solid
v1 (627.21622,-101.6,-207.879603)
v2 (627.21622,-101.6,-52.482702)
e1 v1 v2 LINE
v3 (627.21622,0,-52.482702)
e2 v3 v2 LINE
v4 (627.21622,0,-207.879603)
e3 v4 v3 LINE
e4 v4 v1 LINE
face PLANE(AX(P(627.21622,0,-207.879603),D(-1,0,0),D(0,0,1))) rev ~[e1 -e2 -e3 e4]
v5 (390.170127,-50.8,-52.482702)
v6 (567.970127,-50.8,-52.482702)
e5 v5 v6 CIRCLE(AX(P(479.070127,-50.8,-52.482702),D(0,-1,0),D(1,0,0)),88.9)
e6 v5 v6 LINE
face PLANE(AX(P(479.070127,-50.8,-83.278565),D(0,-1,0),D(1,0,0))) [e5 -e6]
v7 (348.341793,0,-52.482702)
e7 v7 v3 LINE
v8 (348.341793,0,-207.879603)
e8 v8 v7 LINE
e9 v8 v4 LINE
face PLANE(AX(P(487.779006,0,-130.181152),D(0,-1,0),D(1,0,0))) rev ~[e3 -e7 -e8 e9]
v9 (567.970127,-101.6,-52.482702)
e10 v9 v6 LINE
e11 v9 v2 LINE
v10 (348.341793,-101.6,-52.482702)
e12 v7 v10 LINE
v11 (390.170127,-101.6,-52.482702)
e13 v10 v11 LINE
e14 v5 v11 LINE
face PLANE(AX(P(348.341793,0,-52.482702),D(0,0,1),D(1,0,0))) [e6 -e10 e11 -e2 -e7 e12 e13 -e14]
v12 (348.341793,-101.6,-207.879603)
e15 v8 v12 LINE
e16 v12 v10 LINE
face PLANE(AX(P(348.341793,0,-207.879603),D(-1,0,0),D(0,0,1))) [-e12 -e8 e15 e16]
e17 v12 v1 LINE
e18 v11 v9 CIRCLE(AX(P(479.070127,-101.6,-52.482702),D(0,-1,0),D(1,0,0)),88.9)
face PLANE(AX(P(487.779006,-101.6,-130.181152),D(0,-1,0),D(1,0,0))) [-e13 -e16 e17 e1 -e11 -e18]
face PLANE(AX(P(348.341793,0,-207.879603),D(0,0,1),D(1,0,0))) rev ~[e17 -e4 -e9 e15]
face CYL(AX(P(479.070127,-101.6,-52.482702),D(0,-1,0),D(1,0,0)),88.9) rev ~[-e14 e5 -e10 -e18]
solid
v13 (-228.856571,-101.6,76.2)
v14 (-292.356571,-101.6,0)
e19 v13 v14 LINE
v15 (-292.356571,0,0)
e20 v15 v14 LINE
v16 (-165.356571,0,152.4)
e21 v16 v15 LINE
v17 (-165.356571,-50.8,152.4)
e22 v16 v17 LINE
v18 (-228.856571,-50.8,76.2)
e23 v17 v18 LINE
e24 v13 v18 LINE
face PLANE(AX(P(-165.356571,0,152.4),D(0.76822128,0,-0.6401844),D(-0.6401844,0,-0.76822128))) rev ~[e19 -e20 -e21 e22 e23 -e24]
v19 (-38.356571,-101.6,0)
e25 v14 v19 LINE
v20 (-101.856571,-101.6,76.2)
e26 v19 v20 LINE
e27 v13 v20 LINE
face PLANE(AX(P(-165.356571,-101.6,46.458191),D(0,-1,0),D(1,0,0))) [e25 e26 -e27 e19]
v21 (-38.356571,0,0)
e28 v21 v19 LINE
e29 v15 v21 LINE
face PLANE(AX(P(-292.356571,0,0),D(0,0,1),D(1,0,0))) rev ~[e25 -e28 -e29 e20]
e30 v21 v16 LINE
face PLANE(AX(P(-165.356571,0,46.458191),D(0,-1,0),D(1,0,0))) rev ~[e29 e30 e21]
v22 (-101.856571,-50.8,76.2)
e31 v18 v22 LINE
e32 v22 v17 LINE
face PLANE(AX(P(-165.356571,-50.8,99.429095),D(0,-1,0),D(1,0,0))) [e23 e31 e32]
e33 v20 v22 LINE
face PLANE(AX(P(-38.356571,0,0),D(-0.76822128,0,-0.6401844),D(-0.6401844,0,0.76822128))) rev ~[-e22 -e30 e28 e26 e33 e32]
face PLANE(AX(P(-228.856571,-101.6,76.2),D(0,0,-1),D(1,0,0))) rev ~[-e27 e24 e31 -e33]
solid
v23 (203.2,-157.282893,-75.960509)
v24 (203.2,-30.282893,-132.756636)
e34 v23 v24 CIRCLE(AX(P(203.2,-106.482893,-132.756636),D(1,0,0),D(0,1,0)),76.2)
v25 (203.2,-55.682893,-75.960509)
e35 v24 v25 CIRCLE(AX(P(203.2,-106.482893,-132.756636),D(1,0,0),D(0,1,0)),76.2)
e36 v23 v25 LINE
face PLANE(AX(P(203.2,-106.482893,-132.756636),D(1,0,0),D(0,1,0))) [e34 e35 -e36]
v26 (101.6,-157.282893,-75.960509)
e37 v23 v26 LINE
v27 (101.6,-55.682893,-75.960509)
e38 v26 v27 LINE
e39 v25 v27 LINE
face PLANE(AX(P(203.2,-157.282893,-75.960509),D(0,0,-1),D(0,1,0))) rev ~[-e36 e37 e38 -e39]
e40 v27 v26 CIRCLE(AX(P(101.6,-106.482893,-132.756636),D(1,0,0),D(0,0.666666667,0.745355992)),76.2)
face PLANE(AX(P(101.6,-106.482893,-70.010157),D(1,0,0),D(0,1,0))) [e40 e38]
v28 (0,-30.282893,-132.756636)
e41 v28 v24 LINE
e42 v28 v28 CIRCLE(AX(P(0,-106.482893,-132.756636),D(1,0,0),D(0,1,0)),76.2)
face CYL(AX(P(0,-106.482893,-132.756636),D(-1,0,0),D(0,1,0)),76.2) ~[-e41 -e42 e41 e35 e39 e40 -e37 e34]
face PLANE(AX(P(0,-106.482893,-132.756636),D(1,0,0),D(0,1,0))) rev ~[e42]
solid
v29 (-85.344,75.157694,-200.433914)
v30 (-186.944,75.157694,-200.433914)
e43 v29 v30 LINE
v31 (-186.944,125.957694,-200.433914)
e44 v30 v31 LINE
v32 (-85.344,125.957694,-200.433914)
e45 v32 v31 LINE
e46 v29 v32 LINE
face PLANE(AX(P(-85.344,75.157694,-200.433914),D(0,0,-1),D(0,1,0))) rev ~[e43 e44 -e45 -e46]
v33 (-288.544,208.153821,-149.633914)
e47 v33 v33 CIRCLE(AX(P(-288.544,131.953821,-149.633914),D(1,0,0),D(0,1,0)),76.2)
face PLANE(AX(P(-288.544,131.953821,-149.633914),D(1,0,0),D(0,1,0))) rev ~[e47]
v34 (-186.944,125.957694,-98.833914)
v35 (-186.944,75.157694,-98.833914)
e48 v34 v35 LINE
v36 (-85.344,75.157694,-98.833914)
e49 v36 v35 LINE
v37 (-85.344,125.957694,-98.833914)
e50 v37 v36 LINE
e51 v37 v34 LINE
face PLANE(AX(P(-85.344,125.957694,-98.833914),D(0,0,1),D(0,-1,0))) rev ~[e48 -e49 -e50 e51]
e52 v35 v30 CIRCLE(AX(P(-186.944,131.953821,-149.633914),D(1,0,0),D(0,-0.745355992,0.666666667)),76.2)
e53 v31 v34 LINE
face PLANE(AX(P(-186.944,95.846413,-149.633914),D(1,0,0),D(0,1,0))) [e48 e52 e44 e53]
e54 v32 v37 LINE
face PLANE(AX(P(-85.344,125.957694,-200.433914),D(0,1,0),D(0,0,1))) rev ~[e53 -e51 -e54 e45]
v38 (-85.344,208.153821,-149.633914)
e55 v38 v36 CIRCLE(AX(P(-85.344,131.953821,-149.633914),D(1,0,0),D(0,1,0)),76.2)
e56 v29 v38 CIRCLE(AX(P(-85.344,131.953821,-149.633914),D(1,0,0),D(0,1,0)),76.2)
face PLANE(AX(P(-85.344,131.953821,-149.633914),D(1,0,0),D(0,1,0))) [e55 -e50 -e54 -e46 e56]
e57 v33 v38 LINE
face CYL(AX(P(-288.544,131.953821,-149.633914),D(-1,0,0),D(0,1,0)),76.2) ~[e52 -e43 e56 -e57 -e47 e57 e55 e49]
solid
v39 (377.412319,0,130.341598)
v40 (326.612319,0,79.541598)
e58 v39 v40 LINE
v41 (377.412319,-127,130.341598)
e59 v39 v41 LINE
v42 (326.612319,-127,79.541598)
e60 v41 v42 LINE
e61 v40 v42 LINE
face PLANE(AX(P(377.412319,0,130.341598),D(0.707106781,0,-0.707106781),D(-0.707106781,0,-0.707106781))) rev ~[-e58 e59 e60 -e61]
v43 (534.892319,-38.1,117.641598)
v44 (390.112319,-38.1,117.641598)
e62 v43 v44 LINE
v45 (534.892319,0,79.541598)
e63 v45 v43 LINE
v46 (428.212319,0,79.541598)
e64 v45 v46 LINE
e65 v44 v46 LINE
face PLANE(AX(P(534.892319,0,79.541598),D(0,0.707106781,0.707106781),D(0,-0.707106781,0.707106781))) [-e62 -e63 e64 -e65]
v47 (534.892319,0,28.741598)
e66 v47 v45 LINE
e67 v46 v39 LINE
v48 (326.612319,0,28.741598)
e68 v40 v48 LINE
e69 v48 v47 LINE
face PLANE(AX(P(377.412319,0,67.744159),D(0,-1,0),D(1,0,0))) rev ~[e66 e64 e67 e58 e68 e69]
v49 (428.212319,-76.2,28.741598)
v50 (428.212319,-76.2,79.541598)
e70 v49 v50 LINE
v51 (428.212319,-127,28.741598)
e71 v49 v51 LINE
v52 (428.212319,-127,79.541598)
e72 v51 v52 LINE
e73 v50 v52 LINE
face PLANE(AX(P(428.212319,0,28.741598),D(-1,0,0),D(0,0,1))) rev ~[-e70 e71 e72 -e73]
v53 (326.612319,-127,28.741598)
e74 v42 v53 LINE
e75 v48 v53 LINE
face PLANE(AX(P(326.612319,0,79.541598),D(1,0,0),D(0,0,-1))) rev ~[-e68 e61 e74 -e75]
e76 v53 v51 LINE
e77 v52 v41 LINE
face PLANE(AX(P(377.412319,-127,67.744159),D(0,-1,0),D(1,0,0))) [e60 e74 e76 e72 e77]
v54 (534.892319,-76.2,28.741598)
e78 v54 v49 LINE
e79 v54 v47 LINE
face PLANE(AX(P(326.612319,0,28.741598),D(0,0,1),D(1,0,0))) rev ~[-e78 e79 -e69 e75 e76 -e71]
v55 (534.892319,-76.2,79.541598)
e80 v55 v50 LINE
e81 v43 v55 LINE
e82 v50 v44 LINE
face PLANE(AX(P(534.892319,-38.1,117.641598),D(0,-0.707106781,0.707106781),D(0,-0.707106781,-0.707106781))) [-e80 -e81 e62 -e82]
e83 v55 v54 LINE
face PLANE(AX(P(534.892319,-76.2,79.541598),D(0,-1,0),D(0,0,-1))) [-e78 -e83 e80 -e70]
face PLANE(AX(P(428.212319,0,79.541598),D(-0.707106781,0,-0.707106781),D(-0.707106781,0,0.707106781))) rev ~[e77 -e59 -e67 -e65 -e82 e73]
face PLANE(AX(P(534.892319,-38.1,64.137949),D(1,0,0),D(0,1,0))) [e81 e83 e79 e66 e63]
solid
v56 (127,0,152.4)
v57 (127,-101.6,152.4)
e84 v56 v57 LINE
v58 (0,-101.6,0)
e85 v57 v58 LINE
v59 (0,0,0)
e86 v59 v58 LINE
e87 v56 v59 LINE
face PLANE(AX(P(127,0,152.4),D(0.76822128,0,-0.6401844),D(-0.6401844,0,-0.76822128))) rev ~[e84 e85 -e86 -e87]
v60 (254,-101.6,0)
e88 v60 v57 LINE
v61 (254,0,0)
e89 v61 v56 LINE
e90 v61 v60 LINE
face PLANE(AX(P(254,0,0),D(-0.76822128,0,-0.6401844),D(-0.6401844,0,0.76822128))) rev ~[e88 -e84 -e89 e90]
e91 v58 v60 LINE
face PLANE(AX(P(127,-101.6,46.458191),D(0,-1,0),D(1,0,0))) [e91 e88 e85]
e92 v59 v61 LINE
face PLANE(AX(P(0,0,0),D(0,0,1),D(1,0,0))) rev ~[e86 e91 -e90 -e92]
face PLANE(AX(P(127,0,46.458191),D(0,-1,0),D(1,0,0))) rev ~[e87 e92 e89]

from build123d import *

# Parameters (mm, degrees)
F1_DEPTH  = 101.6
F3_DEPTH  = 50.8
F5_DEPTH  = 101.6
F7_DEPTH  = 127
F8_DEPTH  = 127
F12_R     = 76.2
F13_DEPTH = 203.2
F15_DEPTH = 101.6
F17_R     = 76.2
F18_DEPTH = 203.2
F20_DEPTH = 101.6
F21_W     = 278.8744270802
F21_H     = 155.3969010711
F22_DEPTH = 101.6
F24_DEPTH = 50.8


with BuildPart() as f1:
    # F0 (on Front) → F1 (new body)
    with BuildSketch(Plane.XZ):
        Polygon((-165.3565709478, 152.4), (-292.3565709478, 0), (-38.3565709478, 0), align=None)
    extrude(amount=F1_DEPTH)

    # F2 (on face) → F3 (cut)
    with BuildSketch(Plane.XZ.offset(101.6)):
        Polygon((-165.3565709478, 152.4), (-228.8565709478, 76.2), (-101.8565709478, 76.2), align=None)
    extrude(amount=-F3_DEPTH, mode=Mode.SUBTRACT)


with BuildPart() as f5:
    # F4 (on Front) → F5 (new body)
    with BuildSketch(Plane.XZ):
        Polygon((127, 152.4), (0, 0), (254, 0), align=None)
    extrude(amount=F5_DEPTH)


with BuildPart() as f7:
    # F6 (on Front) → F7 (new body)
    with BuildSketch(Plane.XZ):
        Polygon((326.6123191833, 79.5415978638), (326.6123191833, 28.7415978638), (428.2123191833, 28.7415978638), (428.2123191833, 79.5415978638), (377.4123191833, 130.3415978638), align=None)
    extrude(amount=F7_DEPTH)

    # F6 (on Front) → F8 (join)
    with BuildSketch(Plane.XZ):
        Polygon((326.6123191833, 79.5415978638), (326.6123191833, 28.7415978638), (428.2123191833, 28.7415978638), (428.2123191833, 79.5415978638), (377.4123191833, 130.3415978638), align=None)
    extrude(amount=F8_DEPTH)

    # F10 (on offset) → F11 (join, up to the next surface of F7)
    with BuildSketch(Plane.YZ.offset(534.8923191833)):
        Polygon((-76.2, 28.7415978638), (0, 28.7415978638), (0, 79.5415978638), (-38.1, 117.6415978638), (-76.2, 79.5415978638), align=None)
    extrude(until=Until.NEXT, dir=(-1, 0, 0))


with BuildPart() as f13:
    # F12 (on Right) → F13 (new body)
    with BuildSketch(Plane.YZ):
        with Locations((-106.4828932285, -132.7566355467)):
            Circle(F12_R)
    extrude(amount=F13_DEPTH)

    # F14 (on face) → F15 (cut)
    with BuildSketch(Plane.YZ.offset(203.2)):
        with BuildLine():
            ThreePointArc((-55.6828932285, -75.9605089182), (-106.4828932285, -56.5566355467), (-157.2828932285, -75.9605089182))
            Line((-157.2828932285, -75.9605089182), (-55.6828932285, -75.9605089182))
        make_face()
    extrude(amount=-F15_DEPTH, mode=Mode.SUBTRACT)


with BuildPart() as f18:
    # F17 (on offset) → F18 (new body)
    with BuildSketch(Plane.YZ.offset(-288.544)):
        with Locations((131.9538205862, -149.6339142323)):
            Circle(F17_R)
    extrude(amount=F18_DEPTH)

    # F19 (on face) → F20 (cut)
    with BuildSketch(Plane.YZ.offset(-85.344)):
        with BuildLine():
            Line((125.9576939577, -98.8339142323), (75.1576939577, -98.8339142323))
            ThreePointArc((75.1576939577, -98.8339142323), (55.7538205862, -149.6339142323), (75.1576939577, -200.4339142323))
            Line((75.1576939577, -200.4339142323), (125.9576939577, -200.4339142323))
            Line((125.9576939577, -200.4339142323), (125.9576939577, -98.8339142323))
        make_face()
    extrude(amount=-F20_DEPTH, mode=Mode.SUBTRACT)


with BuildPart() as f22:
    # F21 (on Front) → F22 (new body)
    with BuildSketch(Plane.XZ):
        with Locations((487.779006362, -130.1811523736)):
            Rectangle(F21_W, F21_H)
    extrude(amount=F22_DEPTH)

    # F23 (on face) → F24 (cut)
    with BuildSketch(Plane.XZ.offset(101.6)):
        with BuildLine():
            ThreePointArc((390.1701270103, -52.482701838), (479.0701270103, -141.382701838), (567.9701270103, -52.482701838))
            Line((567.9701270103, -52.482701838), (390.1701270103, -52.482701838))
        make_face()
        with BuildLine():
            Line((390.1701270103, -52.482701838), (567.9701270103, -52.482701838))
            ThreePointArc((567.9701270103, -52.482701838), (479.0701270103, 36.417298162), (390.1701270103, -52.482701838))
        make_face()
    extrude(amount=-F24_DEPTH, mode=Mode.SUBTRACT)


solid = Compound([f1.part, f5.part, f7.part, f13.part, f18.part, f22.part])
